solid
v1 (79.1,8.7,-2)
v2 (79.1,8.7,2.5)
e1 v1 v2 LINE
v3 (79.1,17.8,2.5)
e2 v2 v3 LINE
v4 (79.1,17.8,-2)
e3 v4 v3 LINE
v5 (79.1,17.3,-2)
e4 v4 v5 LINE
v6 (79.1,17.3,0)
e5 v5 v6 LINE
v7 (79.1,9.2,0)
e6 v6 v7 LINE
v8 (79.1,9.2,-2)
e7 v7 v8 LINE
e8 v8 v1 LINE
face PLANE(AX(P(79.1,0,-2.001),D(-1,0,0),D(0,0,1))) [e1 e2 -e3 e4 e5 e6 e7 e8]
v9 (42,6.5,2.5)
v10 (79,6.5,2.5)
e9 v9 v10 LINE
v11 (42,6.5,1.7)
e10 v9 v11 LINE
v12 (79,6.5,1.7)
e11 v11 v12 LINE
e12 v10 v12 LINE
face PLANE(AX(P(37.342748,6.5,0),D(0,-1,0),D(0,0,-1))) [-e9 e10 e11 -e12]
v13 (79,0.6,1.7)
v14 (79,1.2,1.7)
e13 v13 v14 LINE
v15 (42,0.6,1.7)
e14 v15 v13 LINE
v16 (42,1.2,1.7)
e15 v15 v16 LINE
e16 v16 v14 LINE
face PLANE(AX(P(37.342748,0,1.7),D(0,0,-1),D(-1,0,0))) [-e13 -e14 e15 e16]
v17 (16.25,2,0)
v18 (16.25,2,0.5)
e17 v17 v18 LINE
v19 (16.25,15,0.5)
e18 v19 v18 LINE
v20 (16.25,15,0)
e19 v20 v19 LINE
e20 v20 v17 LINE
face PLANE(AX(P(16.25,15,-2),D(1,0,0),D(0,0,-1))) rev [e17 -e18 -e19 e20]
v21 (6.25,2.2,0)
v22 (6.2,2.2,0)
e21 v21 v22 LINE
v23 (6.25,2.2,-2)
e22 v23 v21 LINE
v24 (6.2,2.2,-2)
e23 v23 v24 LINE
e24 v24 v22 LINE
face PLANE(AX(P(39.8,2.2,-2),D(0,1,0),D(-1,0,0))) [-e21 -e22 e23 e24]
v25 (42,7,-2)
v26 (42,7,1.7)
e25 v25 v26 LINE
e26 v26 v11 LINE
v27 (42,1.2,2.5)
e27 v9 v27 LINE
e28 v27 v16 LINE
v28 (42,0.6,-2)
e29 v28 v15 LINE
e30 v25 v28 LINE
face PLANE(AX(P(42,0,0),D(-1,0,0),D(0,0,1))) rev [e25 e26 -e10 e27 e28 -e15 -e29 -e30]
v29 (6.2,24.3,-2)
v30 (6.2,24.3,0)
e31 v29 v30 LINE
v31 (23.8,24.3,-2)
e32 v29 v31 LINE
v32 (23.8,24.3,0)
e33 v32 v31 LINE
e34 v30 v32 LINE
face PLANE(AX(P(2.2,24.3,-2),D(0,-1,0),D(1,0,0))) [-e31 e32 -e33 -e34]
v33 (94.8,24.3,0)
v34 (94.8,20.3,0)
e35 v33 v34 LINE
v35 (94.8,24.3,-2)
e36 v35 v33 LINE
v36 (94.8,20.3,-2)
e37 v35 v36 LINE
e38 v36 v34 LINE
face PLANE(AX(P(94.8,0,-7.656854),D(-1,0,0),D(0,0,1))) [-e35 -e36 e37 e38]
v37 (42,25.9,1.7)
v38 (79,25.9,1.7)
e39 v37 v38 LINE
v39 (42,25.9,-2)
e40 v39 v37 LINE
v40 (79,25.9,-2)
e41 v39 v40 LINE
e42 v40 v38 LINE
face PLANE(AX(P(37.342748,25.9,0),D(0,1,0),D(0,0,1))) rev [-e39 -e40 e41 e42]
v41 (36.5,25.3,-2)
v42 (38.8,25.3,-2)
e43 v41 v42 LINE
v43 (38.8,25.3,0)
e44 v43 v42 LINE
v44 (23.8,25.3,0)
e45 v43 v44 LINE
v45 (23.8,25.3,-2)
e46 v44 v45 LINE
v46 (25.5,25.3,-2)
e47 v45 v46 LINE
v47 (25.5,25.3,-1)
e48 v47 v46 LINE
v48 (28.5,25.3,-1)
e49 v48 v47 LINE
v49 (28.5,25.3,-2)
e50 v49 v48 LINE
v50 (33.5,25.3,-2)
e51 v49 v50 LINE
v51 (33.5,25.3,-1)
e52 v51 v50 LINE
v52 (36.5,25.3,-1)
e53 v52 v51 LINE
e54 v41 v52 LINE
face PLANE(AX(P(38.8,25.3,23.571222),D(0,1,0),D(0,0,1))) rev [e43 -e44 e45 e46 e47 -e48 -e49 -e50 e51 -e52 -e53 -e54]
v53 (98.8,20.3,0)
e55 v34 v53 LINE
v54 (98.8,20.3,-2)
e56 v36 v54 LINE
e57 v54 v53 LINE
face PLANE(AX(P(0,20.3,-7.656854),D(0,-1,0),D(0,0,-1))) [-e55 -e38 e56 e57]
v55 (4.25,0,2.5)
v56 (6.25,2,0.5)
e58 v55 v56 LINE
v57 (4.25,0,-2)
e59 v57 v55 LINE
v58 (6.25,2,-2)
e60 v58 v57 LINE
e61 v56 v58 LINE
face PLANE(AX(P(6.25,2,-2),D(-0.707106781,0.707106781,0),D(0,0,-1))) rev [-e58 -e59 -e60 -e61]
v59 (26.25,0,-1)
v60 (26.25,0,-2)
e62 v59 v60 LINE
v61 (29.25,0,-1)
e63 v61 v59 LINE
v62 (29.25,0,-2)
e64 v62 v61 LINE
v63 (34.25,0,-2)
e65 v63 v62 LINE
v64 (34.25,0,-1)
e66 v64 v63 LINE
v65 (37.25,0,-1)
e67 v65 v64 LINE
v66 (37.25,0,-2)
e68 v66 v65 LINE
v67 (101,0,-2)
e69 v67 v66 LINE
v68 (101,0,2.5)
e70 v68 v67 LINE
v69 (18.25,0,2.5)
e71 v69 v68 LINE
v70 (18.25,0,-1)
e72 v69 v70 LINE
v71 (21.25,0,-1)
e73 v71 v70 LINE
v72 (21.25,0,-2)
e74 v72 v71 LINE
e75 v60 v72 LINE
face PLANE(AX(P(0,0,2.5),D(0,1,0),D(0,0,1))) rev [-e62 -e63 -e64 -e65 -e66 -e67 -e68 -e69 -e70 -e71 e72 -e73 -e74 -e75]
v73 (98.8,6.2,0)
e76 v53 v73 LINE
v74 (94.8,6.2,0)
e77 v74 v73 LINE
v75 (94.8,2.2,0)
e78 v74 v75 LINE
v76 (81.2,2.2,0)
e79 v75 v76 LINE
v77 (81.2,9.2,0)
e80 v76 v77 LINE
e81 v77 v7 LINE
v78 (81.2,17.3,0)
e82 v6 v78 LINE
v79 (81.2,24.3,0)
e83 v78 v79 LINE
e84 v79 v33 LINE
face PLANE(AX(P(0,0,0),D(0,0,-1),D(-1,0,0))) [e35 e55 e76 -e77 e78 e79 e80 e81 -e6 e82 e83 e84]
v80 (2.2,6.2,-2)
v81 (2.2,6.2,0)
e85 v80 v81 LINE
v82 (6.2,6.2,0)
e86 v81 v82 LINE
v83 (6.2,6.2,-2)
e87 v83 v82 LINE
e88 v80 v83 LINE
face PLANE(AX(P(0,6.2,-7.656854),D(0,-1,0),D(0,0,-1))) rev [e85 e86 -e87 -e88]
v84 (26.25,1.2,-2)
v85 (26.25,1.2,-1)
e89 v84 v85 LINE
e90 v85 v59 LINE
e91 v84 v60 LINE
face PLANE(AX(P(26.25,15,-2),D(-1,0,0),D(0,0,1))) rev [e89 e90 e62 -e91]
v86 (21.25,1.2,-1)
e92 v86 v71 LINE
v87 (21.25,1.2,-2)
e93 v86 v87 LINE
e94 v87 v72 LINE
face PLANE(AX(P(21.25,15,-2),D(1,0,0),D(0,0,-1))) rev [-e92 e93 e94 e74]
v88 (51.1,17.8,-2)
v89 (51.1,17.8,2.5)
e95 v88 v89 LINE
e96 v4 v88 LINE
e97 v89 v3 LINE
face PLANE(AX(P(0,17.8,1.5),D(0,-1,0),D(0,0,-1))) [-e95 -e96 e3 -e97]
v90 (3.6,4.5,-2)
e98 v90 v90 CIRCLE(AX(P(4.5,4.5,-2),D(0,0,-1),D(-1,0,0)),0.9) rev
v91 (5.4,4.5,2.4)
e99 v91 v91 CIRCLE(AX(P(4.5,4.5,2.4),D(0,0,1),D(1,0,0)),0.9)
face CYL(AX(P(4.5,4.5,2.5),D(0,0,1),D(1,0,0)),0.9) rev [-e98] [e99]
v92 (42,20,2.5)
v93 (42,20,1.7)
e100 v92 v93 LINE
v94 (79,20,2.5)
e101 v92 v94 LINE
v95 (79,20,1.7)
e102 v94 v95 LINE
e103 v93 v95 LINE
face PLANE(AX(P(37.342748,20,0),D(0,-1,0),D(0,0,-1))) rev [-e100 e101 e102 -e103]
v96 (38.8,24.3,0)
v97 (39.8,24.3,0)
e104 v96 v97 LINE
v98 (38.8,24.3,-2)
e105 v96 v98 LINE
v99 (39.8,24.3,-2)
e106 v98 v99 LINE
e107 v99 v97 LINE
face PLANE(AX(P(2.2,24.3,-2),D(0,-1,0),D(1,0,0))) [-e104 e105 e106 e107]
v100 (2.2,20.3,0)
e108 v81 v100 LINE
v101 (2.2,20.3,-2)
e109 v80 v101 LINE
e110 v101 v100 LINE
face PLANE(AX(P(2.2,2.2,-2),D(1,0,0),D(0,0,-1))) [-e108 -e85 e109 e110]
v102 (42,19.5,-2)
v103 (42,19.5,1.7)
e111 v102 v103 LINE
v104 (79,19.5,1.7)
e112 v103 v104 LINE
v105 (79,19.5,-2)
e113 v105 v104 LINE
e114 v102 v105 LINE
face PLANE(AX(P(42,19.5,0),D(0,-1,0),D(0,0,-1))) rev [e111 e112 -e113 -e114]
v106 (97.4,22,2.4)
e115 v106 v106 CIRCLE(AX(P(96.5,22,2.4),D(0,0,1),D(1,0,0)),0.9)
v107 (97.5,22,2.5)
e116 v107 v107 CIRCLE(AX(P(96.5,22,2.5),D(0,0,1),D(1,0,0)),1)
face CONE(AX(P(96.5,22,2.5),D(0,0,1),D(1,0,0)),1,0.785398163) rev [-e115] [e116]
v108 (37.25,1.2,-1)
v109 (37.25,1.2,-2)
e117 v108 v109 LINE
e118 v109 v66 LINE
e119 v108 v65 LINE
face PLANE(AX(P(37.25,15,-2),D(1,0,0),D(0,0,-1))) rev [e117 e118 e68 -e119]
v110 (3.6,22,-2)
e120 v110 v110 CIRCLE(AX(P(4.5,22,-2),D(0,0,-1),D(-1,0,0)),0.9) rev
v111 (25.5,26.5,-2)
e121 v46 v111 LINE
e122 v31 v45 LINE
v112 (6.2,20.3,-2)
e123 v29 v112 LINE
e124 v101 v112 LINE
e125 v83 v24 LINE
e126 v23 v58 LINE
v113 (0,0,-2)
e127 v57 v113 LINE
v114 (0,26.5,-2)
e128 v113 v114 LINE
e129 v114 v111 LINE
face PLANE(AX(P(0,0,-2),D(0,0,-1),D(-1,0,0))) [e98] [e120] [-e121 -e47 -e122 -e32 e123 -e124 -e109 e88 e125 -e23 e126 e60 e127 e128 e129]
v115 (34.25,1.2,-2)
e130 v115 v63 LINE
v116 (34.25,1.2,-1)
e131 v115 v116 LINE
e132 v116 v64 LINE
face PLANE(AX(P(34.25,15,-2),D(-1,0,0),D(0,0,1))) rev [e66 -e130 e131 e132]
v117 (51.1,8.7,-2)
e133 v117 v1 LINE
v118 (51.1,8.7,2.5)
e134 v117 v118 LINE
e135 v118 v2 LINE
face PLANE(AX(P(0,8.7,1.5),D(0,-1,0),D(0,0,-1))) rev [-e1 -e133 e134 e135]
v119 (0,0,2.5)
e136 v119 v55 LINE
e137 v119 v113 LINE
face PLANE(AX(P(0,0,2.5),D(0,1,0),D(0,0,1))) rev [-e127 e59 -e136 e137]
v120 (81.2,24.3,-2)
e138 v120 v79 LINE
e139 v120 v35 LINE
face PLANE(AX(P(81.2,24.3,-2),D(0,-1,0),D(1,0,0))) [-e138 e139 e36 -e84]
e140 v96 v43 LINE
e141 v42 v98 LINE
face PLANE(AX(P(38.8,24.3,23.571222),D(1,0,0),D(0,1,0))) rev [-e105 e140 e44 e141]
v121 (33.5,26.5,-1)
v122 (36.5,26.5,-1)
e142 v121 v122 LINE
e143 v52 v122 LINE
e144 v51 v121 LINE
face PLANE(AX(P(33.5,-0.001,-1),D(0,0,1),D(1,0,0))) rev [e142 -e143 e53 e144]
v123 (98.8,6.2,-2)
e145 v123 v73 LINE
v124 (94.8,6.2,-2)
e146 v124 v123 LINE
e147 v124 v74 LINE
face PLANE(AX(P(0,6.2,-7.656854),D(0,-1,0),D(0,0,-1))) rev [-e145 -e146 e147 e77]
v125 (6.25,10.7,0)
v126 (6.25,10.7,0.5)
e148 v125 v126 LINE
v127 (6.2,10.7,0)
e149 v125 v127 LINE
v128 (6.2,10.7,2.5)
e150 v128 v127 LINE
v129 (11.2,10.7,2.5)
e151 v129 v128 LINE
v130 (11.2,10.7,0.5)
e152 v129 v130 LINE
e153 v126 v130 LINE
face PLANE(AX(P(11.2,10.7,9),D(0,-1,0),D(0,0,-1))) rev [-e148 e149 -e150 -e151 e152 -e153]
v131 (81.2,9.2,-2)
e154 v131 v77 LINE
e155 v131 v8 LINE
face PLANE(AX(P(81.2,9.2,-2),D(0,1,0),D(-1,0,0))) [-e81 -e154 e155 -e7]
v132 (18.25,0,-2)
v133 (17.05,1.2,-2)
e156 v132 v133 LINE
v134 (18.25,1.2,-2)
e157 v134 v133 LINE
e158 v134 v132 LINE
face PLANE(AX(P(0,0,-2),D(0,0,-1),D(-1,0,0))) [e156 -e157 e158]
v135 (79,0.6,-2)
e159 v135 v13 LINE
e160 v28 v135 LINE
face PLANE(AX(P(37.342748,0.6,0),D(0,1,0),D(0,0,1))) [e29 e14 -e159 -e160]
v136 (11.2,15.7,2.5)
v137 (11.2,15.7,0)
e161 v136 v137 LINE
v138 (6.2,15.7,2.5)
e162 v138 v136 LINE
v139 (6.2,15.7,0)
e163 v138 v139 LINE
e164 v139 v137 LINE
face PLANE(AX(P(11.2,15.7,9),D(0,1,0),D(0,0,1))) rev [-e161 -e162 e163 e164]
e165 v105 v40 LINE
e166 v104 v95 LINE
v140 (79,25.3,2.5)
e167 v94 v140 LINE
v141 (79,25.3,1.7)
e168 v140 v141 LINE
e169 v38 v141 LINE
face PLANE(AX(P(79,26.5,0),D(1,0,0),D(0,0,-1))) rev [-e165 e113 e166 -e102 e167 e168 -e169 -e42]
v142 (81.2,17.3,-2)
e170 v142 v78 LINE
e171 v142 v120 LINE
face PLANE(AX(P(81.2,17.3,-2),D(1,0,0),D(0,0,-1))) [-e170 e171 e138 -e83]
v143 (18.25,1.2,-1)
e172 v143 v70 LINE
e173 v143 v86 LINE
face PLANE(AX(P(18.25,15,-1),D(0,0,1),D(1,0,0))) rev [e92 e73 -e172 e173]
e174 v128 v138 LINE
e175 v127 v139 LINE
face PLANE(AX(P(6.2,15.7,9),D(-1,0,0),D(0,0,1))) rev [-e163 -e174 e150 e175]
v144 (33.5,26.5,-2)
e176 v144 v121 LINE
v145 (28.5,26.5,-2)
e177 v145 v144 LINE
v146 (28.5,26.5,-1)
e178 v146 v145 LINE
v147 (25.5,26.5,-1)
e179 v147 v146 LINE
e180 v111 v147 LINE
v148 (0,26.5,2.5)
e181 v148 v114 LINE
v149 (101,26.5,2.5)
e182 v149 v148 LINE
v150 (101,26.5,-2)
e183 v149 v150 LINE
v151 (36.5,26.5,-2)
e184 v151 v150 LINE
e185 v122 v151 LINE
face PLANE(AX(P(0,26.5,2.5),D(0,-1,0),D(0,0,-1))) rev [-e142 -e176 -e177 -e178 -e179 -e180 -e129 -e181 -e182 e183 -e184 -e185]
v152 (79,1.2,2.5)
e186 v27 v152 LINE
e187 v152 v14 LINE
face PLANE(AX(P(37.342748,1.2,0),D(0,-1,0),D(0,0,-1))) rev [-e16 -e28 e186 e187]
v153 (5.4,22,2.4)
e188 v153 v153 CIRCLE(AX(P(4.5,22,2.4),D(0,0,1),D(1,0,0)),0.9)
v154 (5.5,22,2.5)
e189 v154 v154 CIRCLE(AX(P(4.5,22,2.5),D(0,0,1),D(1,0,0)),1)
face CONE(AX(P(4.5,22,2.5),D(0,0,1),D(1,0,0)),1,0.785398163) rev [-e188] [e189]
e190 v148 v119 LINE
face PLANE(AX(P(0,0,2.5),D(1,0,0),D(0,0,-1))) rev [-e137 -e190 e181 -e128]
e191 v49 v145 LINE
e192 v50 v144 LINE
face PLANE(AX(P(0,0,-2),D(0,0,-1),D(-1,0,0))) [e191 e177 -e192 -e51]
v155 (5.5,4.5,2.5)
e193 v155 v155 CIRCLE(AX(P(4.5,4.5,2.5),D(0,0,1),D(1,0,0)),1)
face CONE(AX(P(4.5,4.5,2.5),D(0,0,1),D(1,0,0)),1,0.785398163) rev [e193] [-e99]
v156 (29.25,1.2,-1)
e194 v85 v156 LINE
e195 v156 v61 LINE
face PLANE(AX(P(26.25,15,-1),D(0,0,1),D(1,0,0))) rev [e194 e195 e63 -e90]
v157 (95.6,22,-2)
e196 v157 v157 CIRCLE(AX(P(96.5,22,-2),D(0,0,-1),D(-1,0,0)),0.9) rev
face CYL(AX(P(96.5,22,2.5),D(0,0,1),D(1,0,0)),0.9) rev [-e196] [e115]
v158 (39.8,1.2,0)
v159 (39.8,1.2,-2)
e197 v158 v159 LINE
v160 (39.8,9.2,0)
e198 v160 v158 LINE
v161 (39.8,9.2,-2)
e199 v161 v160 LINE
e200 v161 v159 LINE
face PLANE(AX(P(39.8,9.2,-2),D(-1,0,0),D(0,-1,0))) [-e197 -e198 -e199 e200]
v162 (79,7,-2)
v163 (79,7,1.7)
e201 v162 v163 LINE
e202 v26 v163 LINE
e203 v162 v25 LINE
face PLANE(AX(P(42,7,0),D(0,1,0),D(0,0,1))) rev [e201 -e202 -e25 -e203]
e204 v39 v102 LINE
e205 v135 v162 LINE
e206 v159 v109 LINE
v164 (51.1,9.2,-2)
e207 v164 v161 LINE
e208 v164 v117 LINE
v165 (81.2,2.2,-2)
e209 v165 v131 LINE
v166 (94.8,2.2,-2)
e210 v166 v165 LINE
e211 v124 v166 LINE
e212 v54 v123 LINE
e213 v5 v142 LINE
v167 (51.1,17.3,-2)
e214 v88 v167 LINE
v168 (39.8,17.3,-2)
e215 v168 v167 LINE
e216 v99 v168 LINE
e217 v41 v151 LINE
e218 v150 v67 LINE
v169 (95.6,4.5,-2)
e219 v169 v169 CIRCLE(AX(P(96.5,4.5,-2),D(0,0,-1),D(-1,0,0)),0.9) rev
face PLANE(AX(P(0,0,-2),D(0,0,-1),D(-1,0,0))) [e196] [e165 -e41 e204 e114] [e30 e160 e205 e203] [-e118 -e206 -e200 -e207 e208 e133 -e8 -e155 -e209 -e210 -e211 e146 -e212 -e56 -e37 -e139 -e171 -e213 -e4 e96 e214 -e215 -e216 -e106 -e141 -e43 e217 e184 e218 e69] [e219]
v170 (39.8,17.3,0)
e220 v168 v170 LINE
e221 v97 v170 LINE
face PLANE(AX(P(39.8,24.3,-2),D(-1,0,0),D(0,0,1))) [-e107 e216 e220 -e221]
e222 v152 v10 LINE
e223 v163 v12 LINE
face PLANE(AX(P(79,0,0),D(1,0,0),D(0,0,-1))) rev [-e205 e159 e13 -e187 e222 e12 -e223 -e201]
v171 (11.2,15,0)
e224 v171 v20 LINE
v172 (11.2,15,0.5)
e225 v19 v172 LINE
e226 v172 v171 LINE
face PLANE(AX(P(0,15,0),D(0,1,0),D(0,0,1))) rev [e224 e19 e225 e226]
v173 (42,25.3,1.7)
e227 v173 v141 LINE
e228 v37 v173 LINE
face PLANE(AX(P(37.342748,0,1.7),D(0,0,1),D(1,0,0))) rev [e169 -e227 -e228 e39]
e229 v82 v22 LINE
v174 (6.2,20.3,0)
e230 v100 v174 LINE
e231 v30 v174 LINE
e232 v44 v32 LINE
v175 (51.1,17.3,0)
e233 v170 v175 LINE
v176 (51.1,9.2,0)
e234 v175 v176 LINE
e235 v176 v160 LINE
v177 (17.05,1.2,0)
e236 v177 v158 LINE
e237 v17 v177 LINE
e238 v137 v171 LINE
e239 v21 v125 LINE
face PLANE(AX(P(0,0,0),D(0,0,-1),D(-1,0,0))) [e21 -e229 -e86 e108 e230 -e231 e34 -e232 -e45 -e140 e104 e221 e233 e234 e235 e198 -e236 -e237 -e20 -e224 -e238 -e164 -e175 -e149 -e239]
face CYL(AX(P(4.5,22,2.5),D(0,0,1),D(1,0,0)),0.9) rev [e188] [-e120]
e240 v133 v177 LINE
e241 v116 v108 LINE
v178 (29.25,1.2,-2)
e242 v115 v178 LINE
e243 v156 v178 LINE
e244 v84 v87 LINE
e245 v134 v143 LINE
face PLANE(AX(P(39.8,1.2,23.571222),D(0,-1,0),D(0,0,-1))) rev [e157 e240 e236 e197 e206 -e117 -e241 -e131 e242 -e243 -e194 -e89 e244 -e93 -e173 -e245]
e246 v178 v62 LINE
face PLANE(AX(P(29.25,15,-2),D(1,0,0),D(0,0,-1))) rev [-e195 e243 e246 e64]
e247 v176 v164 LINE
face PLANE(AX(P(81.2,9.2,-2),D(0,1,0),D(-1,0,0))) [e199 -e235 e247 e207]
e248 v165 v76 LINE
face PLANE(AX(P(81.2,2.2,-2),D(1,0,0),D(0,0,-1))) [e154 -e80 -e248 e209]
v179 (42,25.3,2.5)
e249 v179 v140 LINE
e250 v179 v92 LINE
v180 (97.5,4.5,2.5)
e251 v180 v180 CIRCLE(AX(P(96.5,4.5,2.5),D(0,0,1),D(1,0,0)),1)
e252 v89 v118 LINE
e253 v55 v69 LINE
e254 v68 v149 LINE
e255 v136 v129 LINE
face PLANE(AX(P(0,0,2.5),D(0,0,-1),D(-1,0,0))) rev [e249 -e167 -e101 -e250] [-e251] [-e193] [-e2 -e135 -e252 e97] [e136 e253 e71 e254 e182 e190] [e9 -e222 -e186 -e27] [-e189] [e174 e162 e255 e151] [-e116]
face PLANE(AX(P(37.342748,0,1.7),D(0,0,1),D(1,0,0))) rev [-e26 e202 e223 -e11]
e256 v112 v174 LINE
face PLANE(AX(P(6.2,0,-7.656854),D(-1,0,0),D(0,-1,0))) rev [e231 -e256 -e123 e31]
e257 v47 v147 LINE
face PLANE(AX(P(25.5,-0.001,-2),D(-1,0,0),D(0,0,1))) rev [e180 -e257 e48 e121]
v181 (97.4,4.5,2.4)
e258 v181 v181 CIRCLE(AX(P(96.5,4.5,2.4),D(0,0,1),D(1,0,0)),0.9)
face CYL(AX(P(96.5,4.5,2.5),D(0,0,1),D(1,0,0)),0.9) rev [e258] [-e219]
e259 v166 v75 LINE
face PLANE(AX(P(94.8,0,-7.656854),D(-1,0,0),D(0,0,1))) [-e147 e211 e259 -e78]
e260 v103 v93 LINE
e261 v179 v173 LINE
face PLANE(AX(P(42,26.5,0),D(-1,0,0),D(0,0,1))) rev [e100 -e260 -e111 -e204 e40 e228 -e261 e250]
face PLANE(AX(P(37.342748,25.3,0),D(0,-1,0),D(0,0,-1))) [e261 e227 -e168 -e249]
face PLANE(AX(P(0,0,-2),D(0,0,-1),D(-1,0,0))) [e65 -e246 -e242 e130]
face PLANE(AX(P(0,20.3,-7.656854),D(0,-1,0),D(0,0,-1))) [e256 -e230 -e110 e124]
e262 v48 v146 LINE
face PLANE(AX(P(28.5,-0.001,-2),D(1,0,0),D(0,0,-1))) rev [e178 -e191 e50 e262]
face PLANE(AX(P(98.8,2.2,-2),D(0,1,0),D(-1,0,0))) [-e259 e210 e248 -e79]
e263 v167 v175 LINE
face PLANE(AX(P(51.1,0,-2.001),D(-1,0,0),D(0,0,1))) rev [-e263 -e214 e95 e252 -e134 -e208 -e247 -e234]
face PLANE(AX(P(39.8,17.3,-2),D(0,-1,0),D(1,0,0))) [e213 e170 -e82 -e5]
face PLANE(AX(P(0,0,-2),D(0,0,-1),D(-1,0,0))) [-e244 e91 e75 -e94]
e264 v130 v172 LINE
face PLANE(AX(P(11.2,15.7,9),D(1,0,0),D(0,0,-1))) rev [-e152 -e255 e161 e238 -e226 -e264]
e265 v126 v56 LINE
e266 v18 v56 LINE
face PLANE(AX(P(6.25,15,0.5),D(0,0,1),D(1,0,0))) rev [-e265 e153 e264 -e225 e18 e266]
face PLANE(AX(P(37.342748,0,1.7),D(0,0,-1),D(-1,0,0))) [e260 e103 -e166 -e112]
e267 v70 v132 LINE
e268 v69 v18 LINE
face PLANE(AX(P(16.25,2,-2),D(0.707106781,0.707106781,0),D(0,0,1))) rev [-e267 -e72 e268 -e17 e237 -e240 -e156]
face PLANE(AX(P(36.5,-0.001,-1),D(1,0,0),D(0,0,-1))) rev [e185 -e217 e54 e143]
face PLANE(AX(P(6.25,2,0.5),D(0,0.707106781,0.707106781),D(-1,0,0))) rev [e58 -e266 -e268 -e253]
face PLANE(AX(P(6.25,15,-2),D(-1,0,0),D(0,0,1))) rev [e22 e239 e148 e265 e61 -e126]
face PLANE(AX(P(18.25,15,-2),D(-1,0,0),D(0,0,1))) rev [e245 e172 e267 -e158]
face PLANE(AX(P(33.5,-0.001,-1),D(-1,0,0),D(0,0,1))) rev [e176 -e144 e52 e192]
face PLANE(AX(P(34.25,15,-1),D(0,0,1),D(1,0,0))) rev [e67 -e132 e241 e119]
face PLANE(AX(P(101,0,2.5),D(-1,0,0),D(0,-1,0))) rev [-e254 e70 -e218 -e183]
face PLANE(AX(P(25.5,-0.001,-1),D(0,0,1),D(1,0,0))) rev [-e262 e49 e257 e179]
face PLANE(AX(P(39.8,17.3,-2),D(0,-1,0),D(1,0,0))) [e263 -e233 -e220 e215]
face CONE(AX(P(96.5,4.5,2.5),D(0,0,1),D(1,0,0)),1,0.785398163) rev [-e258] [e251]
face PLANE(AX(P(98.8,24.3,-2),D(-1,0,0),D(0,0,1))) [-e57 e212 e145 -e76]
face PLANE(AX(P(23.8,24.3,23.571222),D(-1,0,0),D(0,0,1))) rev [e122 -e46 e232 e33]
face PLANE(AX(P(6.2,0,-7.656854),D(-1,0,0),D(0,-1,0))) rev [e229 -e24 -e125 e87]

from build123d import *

# Parameters (mm, degrees)
SKETCH_1_W                   = 101
SKETCH_1_H                   = 26.5
EXTRUDE_1_DEPTH              = 2.5
SKETCH_10_W                  = 37
SKETCH_10_H                  = 7
CUT_EXTRUDE_1_DEPTH          = 2.5
EXTRUDE_2_DEPTH              = 2
HOLE_WIZARD_M6_4_D           = 1.8
HOLE_WIZARD_M6_4_CSINK_D     = 2
HOLE_WIZARD_M6_4_CSINK_ANGLE = 90
EXTRUDE_START                = 2
SKETCH_17_W                  = 4
SKETCH_17_H                  = 4
SKETCH_17_R                  = 0.9
EXTRUDE_3_DEPTH              = 2
SKETCH_18_W                  = 42.1
SKETCH_18_H                  = 9.1
CUT_EXTRUDE_2_DEPTH          = 1
CUT_EXTRUDE_3_REACH          = 106.477
SKETCH_20_W                  = 28
SKETCH_20_H                  = 9.1
SKETCH_22_W                  = 0.8
SKETCH_22_H                  = 0.5
EXTRUDE_4_DEPTH              = 37
EXTRUDE_5_DEPTH              = 1
SKETCH_24_W                  = 10
SKETCH_24_H                  = 2.5
SKETCH_24_W_2                = 3
SKETCH_24_H_2                = 1
CUT_EXTRUDE_4_DEPTH          = 15
CHAMFER_1_SIZE               = 2
CUT_EXTRUDE_5_REACH          = 106.449
SKETCH_25_W                  = 3
SKETCH_25_H                  = 1
SKETCH_27_W                  = 5
SKETCH_27_H                  = 5
CUT_EXTRUDE_6_DEPTH          = 9
SKETCH_28_W                  = 15
SKETCH_28_H                  = 1
SKETCH_28_W_2                = 23.55
CUT_EXTRUDE_7_DEPTH          = 2


with BuildPart() as part:
    # 草图1 → 凸台-拉伸1 (new body)
    with BuildSketch(Plane.XY):
        with Locations((50.5, 13.25)):
            Rectangle(SKETCH_1_W, SKETCH_1_H)
    extrude(amount=EXTRUDE_1_DEPTH)

    # 草图10 → 切除-拉伸1 (cut)
    with BuildSketch(Plane.XY.offset(2.5)):
        with Locations((60.5, 23)):
            Rectangle(SKETCH_10_W, SKETCH_10_H)
        with Locations((60.5, 3.5)):
            Rectangle(SKETCH_10_W, SKETCH_10_H)
    extrude(amount=-CUT_EXTRUDE_1_DEPTH, mode=Mode.SUBTRACT)

    # 草图11 → 凸台-拉伸2 (add)
    with BuildSketch(Plane(origin=(0, 0, 0), x_dir=(-1, 0, 0), z_dir=(0, 0, -1))):
        Polygon((-42, 26.5), (-42, 19.5), (-79, 19.5), (-79, 26.5), (-101, 26.5), (-101, 0), (-79, 0), (-79, 7), (-42, 7), (-42, 0), (0, 0), (0, 26.5), align=None)
        Polygon((-39.8, 24.3), (-39.8, 17.3), (-81.2, 17.3), (-81.2, 24.3), (-98.8, 24.3), (-98.8, 2.2), (-81.2, 2.2), (-81.2, 9.2), (-39.8, 9.2), (-39.8, 2.2), (-2.2, 2.2), (-2.2, 24.3), align=None, mode=Mode.SUBTRACT)
    extrude(amount=EXTRUDE_2_DEPTH)

    # M6 开槽半沉头螺钉的锥形沉头孔4 (through all)
    with Locations(Plane(origin=(0, 0, 2.5), x_dir=(-1, 0, 0), z_dir=(0, 0, 1))):
        with Locations((-4.5, -4.5), (-96.5, -22), (-96.5, -4.5), (-4.5, -22)):
            CounterSinkHole(HOLE_WIZARD_M6_4_D / 2, HOLE_WIZARD_M6_4_CSINK_D / 2, counter_sink_angle=HOLE_WIZARD_M6_4_CSINK_ANGLE)

    # 草图17 → 凸台-拉伸3 (add)
    # profile 1 of 4: a face of its own
    with BuildSketch(Plane(origin=(0, 0, 0), x_dir=(-1, 0, 0), z_dir=(0, 0, -1)).offset(EXTRUDE_START)):
        with Locations((-96.8, 22.3)):
            Rectangle(SKETCH_17_W, SKETCH_17_H)
        with Locations(Location((-96.5, 22, 0), (0, 0, 180))):
            Circle(SKETCH_17_R, mode=Mode.SUBTRACT)
    # profile 2 of 4: a face of its own
    with BuildSketch(Plane(origin=(0, 0, 0), x_dir=(-1, 0, 0), z_dir=(0, 0, -1)).offset(EXTRUDE_START)):
        with Locations((-96.8, 4.2)):
            Rectangle(SKETCH_17_W, SKETCH_17_H)
        with Locations(Location((-96.5, 4.5, 0), (0, 0, 180))):
            Circle(SKETCH_17_R, mode=Mode.SUBTRACT)
    # profile 3 of 4: a face of its own
    with BuildSketch(Plane(origin=(0, 0, 0), x_dir=(-1, 0, 0), z_dir=(0, 0, -1)).offset(EXTRUDE_START)):
        with Locations((-4.2, 22.3)):
            Rectangle(SKETCH_17_W, SKETCH_17_H)
        with Locations(Location((-4.5, 22, 0), (0, 0, 180))):
            Circle(SKETCH_17_R, mode=Mode.SUBTRACT)
    # profile 4 of 4: a face of its own
    with BuildSketch(Plane(origin=(0, 0, 0), x_dir=(-1, 0, 0), z_dir=(0, 0, -1)).offset(EXTRUDE_START)):
        with Locations((-4.2, 4.2)):
            Rectangle(SKETCH_17_W, SKETCH_17_H)
        with Locations(Location((-4.5, 4.5, 0), (0, 0, 180))):
            Circle(SKETCH_17_R, mode=Mode.SUBTRACT)
    extrude(amount=-EXTRUDE_3_DEPTH)

    # 草图18 → 切除-拉伸2 (cut)
    with BuildSketch(Plane.XY.offset(2.5)):
        Polygon((37, 8.7), (37, 17.8), (37, 19.5), (32, 19.5), (32, 7), (37, 7), align=None)
        with Locations((58.05, 13.25)):
            Rectangle(SKETCH_18_W, SKETCH_18_H)
        Polygon((79.1, 19.5), (79.1, 17.8), (79.1, 8.7), (79.1, 7), (84.1, 7), (84.1, 19.5), align=None)
    extrude(amount=-CUT_EXTRUDE_2_DEPTH, mode=Mode.SUBTRACT)

    # 草图20 → 切除-拉伸3 (cut, up to next)
    with BuildSketch(Plane.XY.offset(1.5), mode=Mode.PRIVATE) as cut_extrude_3_sk1:
        with Locations((65.1, 13.25)):
            Rectangle(SKETCH_20_W, SKETCH_20_H)
    cut_extrude_3_tool1 = extrude(cut_extrude_3_sk1.sketch, amount=-CUT_EXTRUDE_3_REACH, mode=Mode.PRIVATE) & part.part
    add(cut_extrude_3_tool1.solids().sort_by_distance((65.1, 13.25, 1.5))[0], mode=Mode.SUBTRACT)

    # 草图22 → 凸台-拉伸4 (add)
    with BuildSketch(Plane.ZY.offset(-79)):
        Polygon((-2, 26.5), (2.5, 26.5), (2.5, 25.35398434), (2.5, 25.3), (1.7, 25.3), (1.7, 25.9), (-2, 25.9), align=None)
        with Locations((2.1, 19.75)):
            Rectangle(SKETCH_22_W, SKETCH_22_H)
        with Locations((2.1, 6.75)):
            Rectangle(SKETCH_22_W, SKETCH_22_H)
        Polygon((-2, 0.6), (-2, 0), (2.5, 0), (2.5, 1.14601566), (2.5, 1.2), (1.7, 1.2), (1.7, 0.6), align=None)
    extrude(amount=EXTRUDE_4_DEPTH)

    # 草图23 → 凸台-拉伸5 (add)
    with BuildSketch(Plane.XY.offset(1.5)):
        Polygon((84.1, 7), (84.1, 19.5), (79.1, 19.5), (79.1, 17.8), (79.1, 8.7), (79.1, 7), align=None)
        Polygon((51.1, 8.7), (51.1, 17.8), (37, 17.8), (37, 19.5), (32, 19.5), (32, 7), (37, 7), (37, 8.7), align=None)
    extrude(amount=EXTRUDE_5_DEPTH)

    # 草图24 → 切除-拉伸4 (cut)
    with BuildSketch(Plane.XZ):
        with Locations((11.25, -0.75)):
            Rectangle(SKETCH_24_W, SKETCH_24_H)
        with Locations((19.75, -1.5)):
            Rectangle(SKETCH_24_W_2, SKETCH_24_H_2)
        with Locations((27.75, -1.5)):
            Rectangle(SKETCH_24_W_2, SKETCH_24_H_2)
        with Locations((35.75, -1.5)):
            Rectangle(SKETCH_24_W_2, SKETCH_24_H_2)
    extrude(amount=-CUT_EXTRUDE_4_DEPTH, mode=Mode.SUBTRACT)

    # 倒角1
    chamfer_1_edges = [part.edges().sort_by_distance(p)[0] for p in [
        (6.25, 0, -0.75),
        (16.25, 0, -0.75),
        (11.25, 0, 0.5),
    ]]
    chamfer(chamfer_1_edges, length=CHAMFER_1_SIZE - 0.0001)  # a hair under: the kernel refuses the full size

    # 草图25 → 切除-拉伸5 (cut, up to next)
    with BuildSketch(Plane(origin=(0, 26.5, 0), x_dir=(1, 0, 0), z_dir=(0, 1, 0)), mode=Mode.PRIVATE) as cut_extrude_5_sk1:
        with Locations((27, 1.5)):
            Rectangle(SKETCH_25_W, SKETCH_25_H)
    cut_extrude_5_tool1 = extrude(cut_extrude_5_sk1.sketch, amount=-CUT_EXTRUDE_5_REACH, mode=Mode.PRIVATE) & part.part
    # 草图25 → 切除-拉伸5 (cut, up to next)
    with BuildSketch(Plane(origin=(0, 26.5, 0), x_dir=(1, 0, 0), z_dir=(0, 1, 0)), mode=Mode.PRIVATE) as cut_extrude_5_sk2:
        with Locations((35, 1.5)):
            Rectangle(SKETCH_25_W, SKETCH_25_H)
    cut_extrude_5_tool2 = extrude(cut_extrude_5_sk2.sketch, amount=-CUT_EXTRUDE_5_REACH, mode=Mode.PRIVATE) & part.part
    add(cut_extrude_5_tool1.solids().sort_by_distance((27, 26.5, -1.5))[0], mode=Mode.SUBTRACT)
    add(cut_extrude_5_tool2.solids().sort_by_distance((35, 26.5, -1.5))[0], mode=Mode.SUBTRACT)

    # 草图27 → 切除-拉伸6 (cut)
    with BuildSketch(Plane(origin=(0, 0, 0), x_dir=(-1, 0, 0), z_dir=(0, 0, -1))):
        with Locations((-8.7, 13.2)):
            Rectangle(SKETCH_27_W, SKETCH_27_H)
    extrude(amount=-CUT_EXTRUDE_6_DEPTH, mode=Mode.SUBTRACT)

    # 草图28 → 切除-拉伸7 (cut)
    with BuildSketch(Plane(origin=(0, 0, -2), x_dir=(-1, 0, 0), z_dir=(0, 0, -1))):
        with Locations((-31.3, 24.8)):
            Rectangle(SKETCH_28_W, SKETCH_28_H)
        with Locations((-28.025, 1.7)):
            Rectangle(SKETCH_28_W_2, SKETCH_28_H)
    extrude(amount=-CUT_EXTRUDE_7_DEPTH, mode=Mode.SUBTRACT)


solid = part.part
